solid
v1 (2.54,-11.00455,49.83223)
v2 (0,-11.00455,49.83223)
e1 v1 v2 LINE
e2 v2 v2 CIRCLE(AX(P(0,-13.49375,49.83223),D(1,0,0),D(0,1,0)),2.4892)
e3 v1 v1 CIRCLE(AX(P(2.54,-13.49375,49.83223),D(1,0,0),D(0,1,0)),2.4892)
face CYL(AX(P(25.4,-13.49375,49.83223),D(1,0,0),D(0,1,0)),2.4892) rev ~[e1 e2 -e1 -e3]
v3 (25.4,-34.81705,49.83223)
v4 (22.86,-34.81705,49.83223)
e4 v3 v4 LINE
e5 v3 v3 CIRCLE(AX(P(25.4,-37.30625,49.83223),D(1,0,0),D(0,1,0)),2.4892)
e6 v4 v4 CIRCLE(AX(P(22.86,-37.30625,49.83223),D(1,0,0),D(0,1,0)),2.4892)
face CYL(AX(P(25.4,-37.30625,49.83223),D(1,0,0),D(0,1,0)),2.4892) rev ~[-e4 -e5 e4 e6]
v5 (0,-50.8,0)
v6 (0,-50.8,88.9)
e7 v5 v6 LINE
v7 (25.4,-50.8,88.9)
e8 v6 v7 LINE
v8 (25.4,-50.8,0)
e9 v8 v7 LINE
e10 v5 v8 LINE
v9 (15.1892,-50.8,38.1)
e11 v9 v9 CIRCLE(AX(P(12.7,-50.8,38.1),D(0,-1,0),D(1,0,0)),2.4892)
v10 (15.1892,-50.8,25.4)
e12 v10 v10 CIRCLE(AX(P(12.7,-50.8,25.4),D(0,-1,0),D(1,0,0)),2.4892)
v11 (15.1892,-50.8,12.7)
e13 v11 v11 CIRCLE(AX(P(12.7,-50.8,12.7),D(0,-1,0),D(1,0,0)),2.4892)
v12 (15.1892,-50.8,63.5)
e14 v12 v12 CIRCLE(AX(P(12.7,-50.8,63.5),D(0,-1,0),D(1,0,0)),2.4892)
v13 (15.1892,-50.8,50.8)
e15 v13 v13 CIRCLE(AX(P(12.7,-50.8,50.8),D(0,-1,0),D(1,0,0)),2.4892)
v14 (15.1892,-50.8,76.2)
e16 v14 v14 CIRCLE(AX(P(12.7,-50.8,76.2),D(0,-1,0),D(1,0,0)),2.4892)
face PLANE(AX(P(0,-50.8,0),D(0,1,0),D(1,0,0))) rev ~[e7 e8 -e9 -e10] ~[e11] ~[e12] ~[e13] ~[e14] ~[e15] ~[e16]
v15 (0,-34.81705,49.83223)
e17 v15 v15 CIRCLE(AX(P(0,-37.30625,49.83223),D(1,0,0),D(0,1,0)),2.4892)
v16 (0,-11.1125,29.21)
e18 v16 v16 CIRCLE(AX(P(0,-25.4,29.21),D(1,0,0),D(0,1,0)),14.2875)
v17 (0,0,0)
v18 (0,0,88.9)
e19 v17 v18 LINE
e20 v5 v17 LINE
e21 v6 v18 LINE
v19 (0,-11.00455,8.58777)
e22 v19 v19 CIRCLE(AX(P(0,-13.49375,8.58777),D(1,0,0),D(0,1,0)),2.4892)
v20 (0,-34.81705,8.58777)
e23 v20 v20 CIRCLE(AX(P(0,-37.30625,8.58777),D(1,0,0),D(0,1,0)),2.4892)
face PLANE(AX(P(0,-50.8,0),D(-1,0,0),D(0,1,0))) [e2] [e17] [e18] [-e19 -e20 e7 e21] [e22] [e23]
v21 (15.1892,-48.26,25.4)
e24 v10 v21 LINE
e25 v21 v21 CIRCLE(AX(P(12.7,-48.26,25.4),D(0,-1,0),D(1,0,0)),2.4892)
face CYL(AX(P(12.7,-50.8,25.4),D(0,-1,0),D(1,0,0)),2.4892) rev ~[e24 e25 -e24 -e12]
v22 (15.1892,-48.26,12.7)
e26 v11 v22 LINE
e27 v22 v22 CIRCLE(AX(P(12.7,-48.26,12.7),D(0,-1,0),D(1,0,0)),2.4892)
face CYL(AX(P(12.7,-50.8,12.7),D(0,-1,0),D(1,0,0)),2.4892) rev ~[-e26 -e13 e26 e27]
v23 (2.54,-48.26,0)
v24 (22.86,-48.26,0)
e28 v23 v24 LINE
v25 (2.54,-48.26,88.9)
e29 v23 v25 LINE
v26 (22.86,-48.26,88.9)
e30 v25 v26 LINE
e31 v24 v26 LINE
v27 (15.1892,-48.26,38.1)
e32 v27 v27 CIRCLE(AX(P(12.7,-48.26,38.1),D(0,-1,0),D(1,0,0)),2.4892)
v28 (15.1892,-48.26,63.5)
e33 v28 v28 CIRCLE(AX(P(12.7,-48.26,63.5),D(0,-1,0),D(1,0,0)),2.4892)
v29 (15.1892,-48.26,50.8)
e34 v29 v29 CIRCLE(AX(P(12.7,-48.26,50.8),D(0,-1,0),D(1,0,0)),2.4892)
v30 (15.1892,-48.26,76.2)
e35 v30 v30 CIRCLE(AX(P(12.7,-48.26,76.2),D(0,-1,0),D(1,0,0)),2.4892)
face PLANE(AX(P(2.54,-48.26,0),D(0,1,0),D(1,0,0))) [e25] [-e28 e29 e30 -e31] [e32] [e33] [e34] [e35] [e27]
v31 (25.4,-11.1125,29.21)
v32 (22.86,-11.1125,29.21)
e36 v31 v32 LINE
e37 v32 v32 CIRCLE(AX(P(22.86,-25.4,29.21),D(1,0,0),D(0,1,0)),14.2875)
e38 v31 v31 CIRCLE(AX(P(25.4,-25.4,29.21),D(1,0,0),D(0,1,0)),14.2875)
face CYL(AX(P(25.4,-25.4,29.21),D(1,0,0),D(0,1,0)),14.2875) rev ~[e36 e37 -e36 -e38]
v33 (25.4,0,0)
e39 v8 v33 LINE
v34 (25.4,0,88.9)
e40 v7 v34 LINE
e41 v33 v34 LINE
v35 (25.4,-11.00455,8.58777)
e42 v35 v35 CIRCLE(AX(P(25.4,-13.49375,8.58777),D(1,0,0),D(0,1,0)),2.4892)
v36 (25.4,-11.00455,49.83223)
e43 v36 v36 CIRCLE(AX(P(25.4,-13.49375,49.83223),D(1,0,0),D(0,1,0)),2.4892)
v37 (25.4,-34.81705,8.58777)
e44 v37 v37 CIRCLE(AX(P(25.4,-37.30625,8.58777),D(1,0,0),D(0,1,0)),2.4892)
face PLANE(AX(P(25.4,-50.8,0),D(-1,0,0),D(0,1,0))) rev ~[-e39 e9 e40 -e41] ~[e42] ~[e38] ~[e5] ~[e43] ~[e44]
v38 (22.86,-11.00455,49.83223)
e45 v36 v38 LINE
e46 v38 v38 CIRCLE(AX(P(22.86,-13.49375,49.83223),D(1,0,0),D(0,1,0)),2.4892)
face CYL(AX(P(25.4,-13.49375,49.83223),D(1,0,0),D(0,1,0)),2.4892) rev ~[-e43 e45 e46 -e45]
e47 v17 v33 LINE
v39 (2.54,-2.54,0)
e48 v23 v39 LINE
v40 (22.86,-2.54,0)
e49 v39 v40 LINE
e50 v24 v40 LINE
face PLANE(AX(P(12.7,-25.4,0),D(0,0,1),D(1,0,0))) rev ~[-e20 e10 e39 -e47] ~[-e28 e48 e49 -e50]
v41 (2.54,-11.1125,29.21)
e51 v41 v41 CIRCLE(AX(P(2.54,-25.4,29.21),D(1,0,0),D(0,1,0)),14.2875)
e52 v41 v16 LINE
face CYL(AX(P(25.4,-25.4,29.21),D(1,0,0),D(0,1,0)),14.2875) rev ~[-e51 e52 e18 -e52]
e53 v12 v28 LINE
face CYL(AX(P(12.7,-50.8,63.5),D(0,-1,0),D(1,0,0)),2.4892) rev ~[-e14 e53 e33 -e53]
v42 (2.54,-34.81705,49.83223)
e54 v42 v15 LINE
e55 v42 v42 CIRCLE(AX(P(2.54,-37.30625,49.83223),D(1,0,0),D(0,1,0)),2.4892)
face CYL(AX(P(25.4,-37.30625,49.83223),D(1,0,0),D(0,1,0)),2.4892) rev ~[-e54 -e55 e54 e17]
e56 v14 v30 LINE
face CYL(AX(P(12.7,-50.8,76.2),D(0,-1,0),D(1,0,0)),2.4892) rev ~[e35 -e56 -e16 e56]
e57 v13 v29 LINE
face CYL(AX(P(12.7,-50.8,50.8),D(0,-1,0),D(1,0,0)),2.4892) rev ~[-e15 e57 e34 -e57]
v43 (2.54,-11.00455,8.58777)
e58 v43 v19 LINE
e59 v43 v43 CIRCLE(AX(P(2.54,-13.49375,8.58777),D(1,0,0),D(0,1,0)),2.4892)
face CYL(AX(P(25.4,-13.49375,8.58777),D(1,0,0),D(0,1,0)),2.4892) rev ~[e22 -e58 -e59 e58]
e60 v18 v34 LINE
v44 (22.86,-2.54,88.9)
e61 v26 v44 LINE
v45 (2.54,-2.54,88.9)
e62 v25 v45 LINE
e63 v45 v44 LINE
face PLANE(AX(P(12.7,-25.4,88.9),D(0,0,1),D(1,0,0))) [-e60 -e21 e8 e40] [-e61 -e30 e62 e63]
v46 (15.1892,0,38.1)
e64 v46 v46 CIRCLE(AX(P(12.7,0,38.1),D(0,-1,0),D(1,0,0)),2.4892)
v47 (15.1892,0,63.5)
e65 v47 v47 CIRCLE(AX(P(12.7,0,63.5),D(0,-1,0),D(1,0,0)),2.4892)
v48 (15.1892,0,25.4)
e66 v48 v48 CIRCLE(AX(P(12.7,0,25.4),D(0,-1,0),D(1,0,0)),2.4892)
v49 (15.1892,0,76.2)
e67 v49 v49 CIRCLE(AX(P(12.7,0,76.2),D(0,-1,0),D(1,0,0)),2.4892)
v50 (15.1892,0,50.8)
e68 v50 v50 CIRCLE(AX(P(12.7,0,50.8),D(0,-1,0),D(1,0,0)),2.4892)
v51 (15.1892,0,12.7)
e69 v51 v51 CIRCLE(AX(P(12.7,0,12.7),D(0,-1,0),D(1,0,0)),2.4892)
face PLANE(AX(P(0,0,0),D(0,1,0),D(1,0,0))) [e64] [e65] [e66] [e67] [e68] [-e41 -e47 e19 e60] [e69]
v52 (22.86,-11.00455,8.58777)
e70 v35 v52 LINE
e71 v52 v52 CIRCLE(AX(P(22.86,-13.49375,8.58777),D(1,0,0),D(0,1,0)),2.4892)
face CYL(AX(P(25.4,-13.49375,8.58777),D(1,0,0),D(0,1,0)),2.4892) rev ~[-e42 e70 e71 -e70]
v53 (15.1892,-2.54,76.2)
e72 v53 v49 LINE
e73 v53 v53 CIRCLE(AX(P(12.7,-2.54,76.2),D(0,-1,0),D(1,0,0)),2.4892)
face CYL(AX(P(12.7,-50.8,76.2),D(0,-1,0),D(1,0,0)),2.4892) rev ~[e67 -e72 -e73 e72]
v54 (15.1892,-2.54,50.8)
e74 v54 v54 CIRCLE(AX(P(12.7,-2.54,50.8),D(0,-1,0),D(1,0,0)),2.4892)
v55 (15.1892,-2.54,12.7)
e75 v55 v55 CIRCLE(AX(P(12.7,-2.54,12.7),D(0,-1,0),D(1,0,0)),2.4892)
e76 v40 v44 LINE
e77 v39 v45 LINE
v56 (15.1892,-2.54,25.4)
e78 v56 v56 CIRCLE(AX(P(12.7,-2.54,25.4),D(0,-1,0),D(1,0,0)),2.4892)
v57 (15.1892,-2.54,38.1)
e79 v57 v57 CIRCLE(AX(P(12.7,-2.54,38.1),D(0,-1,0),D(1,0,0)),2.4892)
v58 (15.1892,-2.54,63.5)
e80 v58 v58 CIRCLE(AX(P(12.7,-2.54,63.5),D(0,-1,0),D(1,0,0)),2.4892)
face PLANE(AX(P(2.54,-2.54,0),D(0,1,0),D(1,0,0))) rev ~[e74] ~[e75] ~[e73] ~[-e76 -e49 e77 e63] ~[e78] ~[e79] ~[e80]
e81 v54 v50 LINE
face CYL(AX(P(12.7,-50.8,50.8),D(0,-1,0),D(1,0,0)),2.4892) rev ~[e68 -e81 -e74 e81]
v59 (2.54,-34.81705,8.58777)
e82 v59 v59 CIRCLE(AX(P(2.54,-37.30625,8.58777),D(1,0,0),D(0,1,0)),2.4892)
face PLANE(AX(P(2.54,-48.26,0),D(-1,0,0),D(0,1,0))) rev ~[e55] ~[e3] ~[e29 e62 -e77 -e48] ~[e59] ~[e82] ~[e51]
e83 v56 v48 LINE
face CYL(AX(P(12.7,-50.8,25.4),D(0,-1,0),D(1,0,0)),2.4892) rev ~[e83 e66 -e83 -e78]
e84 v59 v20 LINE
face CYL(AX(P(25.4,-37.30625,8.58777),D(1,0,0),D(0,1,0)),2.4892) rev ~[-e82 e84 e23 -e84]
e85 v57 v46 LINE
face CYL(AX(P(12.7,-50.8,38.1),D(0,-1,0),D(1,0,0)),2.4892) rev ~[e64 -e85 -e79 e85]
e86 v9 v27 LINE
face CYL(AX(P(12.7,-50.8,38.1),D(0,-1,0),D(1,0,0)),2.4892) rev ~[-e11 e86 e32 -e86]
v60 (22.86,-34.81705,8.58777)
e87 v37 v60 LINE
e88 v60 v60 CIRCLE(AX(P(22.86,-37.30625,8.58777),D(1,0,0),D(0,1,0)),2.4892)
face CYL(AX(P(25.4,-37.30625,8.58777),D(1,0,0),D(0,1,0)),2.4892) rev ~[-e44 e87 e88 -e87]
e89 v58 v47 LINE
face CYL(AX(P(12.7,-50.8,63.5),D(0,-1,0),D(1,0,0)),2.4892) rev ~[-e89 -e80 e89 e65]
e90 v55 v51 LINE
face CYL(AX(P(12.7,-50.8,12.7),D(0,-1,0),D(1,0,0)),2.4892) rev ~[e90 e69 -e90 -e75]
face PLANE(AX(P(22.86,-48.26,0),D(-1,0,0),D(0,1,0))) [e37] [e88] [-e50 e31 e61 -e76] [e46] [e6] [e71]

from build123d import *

# Parameters (mm, degrees)
F0_W     = 25.4
F0_H     = 50.8
F0_W_2   = 20.32
F0_H_2   = 45.72
F1_DEPTH = 88.9
F2_R     = 14.2875
F3_DEPTH = 50.8
F4_R     = 2.4892
F5_DEPTH = 25.401
F6_R     = 2.4892
F7_DEPTH = 50.801


# Not quite as in the source:
# - a feature names something its author has since deleted; it is built from what else it names


with BuildPart() as f1:
    # F0 (on Top) → F1 (new body)
    with BuildSketch(Plane.XY):
        with Locations((12.7, -25.4)):
            Rectangle(F0_W, F0_H)
        with Locations((12.7, -25.4)):
            Rectangle(F0_W_2, F0_H_2, mode=Mode.SUBTRACT)
    extrude(amount=F1_DEPTH)

    # F2 (on face) → F3 (cut)
    with BuildSketch(Plane.YZ.offset(25.4)):
        with Locations((-25.4, 29.21)):
            Circle(F2_R)
    extrude(amount=-F3_DEPTH, mode=Mode.SUBTRACT)

    # F4 (on face) → F5 (cut, through all)
    with BuildSketch(Plane.YZ.offset(25.4)):
        with Locations((-13.49375, 49.8322299276)):
            Circle(F4_R)
        with Locations((-13.49375, 8.5877700724)):
            Circle(F4_R)
        with Locations((-37.30625, 8.5877700724)):
            Circle(F4_R)
        with Locations((-37.30625, 49.8322299276)):
            Circle(F4_R)
    extrude(amount=-F5_DEPTH, mode=Mode.SUBTRACT)

    # F6 (on face) → F7 (cut, through all)
    with BuildSketch(Plane.XZ.offset(50.8)):
        with Locations((12.7, 12.7)):
            Circle(F6_R)
        with Locations((12.7, 25.4)):
            Circle(F6_R)
        with Locations((12.7, 38.1)):
            Circle(F6_R)
        with Locations((12.7, 50.8)):
            Circle(F6_R)
        with Locations((12.7, 63.5)):
            Circle(F6_R)
        with Locations((12.7, 76.2)):
            Circle(F6_R)
    extrude(amount=-F7_DEPTH, mode=Mode.SUBTRACT)


solid = f1.part
